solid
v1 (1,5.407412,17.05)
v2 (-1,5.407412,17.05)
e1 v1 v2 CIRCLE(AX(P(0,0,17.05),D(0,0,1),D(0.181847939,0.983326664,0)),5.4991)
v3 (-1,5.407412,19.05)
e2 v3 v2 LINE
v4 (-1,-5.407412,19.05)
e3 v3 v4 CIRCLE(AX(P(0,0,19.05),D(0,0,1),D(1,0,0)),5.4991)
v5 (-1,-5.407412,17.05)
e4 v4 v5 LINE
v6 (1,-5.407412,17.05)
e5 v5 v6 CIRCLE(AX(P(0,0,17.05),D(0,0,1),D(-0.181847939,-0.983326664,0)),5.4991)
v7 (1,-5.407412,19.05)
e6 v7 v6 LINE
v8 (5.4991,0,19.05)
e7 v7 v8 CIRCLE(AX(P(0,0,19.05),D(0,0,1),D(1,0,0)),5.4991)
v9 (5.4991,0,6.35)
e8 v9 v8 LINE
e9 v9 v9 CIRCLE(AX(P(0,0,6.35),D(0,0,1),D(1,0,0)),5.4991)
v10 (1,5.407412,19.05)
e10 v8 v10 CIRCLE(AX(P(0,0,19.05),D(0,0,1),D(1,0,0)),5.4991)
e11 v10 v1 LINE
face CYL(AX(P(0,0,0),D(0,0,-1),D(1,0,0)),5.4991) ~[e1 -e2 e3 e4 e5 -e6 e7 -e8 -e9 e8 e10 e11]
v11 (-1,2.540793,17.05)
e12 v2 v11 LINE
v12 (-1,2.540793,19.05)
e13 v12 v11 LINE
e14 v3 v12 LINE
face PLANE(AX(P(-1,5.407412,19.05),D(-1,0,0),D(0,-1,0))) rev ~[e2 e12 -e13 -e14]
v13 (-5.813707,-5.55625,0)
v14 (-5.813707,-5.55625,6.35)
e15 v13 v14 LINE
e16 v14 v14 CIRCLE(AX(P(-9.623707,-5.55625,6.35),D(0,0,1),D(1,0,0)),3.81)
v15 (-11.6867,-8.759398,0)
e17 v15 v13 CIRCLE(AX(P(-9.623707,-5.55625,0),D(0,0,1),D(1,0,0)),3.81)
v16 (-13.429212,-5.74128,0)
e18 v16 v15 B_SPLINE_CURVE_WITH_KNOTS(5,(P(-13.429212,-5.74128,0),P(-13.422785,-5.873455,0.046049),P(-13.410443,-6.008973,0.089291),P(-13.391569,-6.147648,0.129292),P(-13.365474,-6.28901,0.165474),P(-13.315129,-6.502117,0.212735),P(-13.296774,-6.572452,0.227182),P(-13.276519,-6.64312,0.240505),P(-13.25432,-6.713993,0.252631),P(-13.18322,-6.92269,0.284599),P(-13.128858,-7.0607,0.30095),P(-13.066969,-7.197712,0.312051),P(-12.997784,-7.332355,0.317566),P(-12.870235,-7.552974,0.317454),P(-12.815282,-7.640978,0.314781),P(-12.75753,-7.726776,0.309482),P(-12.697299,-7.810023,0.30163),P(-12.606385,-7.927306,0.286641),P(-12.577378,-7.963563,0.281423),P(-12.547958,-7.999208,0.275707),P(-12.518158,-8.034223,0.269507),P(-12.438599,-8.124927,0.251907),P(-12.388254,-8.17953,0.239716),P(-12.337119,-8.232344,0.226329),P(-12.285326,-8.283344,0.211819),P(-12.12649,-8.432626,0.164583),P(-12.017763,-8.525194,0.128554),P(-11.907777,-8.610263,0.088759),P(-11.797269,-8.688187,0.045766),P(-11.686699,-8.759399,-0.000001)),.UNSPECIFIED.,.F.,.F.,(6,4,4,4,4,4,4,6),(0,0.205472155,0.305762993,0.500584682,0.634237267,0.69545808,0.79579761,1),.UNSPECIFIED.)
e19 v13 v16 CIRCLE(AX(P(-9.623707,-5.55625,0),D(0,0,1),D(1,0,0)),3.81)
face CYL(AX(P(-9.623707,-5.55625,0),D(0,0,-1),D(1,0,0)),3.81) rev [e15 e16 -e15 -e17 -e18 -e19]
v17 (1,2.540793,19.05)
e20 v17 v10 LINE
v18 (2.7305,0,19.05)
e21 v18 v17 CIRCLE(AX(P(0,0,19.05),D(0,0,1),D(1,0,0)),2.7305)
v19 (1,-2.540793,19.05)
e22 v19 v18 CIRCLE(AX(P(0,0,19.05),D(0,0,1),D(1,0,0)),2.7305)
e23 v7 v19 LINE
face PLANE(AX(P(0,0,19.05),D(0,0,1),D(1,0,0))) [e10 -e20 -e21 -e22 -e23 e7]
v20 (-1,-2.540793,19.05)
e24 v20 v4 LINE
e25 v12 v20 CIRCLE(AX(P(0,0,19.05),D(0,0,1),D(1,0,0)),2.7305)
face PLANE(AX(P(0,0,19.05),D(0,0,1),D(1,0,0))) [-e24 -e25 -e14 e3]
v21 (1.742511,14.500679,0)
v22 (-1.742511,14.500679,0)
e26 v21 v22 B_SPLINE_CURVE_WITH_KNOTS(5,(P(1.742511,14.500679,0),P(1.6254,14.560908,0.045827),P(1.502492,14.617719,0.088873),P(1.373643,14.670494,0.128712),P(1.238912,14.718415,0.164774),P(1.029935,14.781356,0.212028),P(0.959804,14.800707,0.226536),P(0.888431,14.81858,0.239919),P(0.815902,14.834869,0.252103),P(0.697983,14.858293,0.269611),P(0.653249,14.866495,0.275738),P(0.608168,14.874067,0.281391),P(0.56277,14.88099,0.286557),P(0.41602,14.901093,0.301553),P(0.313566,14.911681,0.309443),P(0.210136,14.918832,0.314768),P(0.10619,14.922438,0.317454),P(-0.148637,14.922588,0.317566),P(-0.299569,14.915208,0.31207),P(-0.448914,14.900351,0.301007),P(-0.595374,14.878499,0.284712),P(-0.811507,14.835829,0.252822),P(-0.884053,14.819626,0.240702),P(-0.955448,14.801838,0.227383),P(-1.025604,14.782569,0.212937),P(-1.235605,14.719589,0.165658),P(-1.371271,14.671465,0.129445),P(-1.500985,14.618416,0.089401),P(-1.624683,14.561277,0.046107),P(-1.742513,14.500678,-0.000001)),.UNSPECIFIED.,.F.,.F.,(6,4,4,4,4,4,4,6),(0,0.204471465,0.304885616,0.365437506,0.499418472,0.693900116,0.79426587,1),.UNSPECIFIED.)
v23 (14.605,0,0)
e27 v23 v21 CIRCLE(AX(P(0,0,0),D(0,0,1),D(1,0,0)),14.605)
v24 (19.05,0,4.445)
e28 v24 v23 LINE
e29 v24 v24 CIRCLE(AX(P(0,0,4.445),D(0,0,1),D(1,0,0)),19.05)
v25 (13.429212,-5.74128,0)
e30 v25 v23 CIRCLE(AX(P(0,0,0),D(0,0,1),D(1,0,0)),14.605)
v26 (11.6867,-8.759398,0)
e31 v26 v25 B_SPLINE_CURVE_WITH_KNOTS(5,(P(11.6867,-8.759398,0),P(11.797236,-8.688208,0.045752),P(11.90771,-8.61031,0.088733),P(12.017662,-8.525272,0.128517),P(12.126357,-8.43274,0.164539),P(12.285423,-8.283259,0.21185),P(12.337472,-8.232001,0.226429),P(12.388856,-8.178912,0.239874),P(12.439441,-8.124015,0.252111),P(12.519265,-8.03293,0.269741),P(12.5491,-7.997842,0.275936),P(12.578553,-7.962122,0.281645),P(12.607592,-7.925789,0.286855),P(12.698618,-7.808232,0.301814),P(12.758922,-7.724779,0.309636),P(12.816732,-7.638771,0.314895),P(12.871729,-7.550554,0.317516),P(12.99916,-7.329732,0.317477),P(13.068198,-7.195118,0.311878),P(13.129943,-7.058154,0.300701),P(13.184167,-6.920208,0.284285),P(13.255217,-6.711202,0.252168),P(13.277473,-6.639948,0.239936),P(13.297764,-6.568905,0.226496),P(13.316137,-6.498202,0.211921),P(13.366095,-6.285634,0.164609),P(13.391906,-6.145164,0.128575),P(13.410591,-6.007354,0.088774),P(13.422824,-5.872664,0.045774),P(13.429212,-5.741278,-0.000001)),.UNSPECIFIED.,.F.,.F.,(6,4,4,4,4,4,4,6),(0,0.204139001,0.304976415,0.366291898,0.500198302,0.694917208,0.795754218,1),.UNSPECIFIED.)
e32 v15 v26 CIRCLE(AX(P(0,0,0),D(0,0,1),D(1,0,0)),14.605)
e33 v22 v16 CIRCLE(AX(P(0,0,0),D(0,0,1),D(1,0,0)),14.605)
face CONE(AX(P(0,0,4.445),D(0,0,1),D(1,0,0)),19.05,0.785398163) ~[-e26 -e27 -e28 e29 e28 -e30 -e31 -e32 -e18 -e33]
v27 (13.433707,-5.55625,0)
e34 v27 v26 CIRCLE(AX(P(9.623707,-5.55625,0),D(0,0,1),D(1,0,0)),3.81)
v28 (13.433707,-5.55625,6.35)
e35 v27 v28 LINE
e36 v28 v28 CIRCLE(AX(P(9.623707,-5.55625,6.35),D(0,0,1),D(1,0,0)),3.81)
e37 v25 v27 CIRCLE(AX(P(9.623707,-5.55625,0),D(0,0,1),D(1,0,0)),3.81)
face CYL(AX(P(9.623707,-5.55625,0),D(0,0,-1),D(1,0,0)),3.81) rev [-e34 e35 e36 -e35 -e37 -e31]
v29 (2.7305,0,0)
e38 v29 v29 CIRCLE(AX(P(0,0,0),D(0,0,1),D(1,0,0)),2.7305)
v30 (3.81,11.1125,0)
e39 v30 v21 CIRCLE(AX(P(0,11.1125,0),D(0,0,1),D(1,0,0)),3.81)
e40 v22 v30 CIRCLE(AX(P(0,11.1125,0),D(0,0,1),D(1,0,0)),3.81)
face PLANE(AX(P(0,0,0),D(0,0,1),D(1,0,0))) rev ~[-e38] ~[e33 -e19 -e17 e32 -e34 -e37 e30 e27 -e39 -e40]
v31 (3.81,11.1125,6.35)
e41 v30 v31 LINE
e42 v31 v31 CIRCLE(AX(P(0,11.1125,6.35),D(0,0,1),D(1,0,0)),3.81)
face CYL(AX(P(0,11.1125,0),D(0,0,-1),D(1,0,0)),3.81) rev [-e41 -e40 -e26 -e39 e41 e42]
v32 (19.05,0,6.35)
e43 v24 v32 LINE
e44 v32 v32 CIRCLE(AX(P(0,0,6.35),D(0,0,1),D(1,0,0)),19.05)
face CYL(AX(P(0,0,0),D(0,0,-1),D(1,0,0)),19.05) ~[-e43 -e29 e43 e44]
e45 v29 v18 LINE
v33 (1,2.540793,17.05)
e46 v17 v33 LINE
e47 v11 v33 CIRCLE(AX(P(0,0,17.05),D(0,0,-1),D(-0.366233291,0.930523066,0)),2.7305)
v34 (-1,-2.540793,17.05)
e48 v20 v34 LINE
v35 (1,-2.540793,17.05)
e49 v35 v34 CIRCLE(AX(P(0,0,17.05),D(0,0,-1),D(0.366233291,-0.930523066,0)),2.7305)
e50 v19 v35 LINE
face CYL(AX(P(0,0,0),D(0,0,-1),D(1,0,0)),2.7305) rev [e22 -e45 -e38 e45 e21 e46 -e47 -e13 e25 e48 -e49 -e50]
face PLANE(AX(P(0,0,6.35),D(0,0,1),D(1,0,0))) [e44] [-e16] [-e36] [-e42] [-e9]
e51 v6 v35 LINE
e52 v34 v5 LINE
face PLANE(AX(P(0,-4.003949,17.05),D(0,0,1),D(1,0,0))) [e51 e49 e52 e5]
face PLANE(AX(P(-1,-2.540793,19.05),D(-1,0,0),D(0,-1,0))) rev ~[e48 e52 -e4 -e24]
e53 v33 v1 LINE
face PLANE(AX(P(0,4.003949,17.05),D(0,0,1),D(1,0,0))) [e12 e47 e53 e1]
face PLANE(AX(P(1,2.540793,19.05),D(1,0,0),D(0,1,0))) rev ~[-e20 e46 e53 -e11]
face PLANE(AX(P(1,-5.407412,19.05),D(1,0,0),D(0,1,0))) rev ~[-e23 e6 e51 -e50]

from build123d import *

# Parameters (mm, degrees)
F0_R     = 19.05
F0_R_2   = 3.81
F0_R_3   = 5.4991
F1_DEPTH = 6.35
F0_R_4   = 2.7305
F2_DEPTH = 19.05
F4_DEPTH = 2


# Not quite as in the source:
# - a fillet or chamfer that OpenCascade refuses, or shapes differently, is made with other operations: its cross-section is extruded or revolved along the edge and cut away or added


with BuildPart() as f1:
    # F0 (on Top) → F1 (new body)
    with BuildSketch(Plane.XY):
        Circle(F0_R)
        with Locations((-9.6237072996, -5.55625)):
            Circle(F0_R_2, mode=Mode.SUBTRACT)
        with Locations((9.6237072996, -5.55625)):
            Circle(F0_R_2, mode=Mode.SUBTRACT)
        Circle(F0_R_3, mode=Mode.SUBTRACT)
        with Locations((0, 11.1125)):
            Circle(F0_R_2, mode=Mode.SUBTRACT)
    extrude(amount=F1_DEPTH)

    # F0 (on Top) → F2 (join)
    with BuildSketch(Plane.XY):
        Circle(F0_R_3)
        Circle(F0_R_4, mode=Mode.SUBTRACT)
    extrude(amount=F2_DEPTH)

    # F3 (on face) → F4 (cut)
    with BuildSketch(Plane.XY.offset(19.05)):
        with BuildLine():
            Line((1, 2.5407932324), (1, 5.4074116553))
            ThreePointArc((1, 5.4074116553), (0, 5.4991), (-1, 5.4074116553))
            Line((-1, 5.4074116553), (-1, 2.5407932324))
            ThreePointArc((-1, 2.5407932324), (0, 2.7305), (1, 2.5407932324))
        make_face()
        with BuildLine():
            Line((1, -5.4074116553), (1, -2.5407932324))
            ThreePointArc((1, -2.5407932324), (0, -2.7305), (-1, -2.5407932324))
            Line((-1, -2.5407932324), (-1, -5.4074116553))
            ThreePointArc((-1, -5.4074116553), (0, -5.4991), (1, -5.4074116553))
        make_face()
    extrude(amount=-F4_DEPTH, mode=Mode.SUBTRACT)

    # F5: chamfer of 4.445 on 1 edges, made by hand

    # F5_s1 → F5_t2 (revolve, cut)
    with BuildSketch(Plane.XZ):
        Polygon((19.05, 4.445), (14.605, 0), (19.05, 0), align=None)
    revolve(axis=Axis((0, 0, 0), (0, 0, 1)), mode=Mode.SUBTRACT)


solid = f1.part
